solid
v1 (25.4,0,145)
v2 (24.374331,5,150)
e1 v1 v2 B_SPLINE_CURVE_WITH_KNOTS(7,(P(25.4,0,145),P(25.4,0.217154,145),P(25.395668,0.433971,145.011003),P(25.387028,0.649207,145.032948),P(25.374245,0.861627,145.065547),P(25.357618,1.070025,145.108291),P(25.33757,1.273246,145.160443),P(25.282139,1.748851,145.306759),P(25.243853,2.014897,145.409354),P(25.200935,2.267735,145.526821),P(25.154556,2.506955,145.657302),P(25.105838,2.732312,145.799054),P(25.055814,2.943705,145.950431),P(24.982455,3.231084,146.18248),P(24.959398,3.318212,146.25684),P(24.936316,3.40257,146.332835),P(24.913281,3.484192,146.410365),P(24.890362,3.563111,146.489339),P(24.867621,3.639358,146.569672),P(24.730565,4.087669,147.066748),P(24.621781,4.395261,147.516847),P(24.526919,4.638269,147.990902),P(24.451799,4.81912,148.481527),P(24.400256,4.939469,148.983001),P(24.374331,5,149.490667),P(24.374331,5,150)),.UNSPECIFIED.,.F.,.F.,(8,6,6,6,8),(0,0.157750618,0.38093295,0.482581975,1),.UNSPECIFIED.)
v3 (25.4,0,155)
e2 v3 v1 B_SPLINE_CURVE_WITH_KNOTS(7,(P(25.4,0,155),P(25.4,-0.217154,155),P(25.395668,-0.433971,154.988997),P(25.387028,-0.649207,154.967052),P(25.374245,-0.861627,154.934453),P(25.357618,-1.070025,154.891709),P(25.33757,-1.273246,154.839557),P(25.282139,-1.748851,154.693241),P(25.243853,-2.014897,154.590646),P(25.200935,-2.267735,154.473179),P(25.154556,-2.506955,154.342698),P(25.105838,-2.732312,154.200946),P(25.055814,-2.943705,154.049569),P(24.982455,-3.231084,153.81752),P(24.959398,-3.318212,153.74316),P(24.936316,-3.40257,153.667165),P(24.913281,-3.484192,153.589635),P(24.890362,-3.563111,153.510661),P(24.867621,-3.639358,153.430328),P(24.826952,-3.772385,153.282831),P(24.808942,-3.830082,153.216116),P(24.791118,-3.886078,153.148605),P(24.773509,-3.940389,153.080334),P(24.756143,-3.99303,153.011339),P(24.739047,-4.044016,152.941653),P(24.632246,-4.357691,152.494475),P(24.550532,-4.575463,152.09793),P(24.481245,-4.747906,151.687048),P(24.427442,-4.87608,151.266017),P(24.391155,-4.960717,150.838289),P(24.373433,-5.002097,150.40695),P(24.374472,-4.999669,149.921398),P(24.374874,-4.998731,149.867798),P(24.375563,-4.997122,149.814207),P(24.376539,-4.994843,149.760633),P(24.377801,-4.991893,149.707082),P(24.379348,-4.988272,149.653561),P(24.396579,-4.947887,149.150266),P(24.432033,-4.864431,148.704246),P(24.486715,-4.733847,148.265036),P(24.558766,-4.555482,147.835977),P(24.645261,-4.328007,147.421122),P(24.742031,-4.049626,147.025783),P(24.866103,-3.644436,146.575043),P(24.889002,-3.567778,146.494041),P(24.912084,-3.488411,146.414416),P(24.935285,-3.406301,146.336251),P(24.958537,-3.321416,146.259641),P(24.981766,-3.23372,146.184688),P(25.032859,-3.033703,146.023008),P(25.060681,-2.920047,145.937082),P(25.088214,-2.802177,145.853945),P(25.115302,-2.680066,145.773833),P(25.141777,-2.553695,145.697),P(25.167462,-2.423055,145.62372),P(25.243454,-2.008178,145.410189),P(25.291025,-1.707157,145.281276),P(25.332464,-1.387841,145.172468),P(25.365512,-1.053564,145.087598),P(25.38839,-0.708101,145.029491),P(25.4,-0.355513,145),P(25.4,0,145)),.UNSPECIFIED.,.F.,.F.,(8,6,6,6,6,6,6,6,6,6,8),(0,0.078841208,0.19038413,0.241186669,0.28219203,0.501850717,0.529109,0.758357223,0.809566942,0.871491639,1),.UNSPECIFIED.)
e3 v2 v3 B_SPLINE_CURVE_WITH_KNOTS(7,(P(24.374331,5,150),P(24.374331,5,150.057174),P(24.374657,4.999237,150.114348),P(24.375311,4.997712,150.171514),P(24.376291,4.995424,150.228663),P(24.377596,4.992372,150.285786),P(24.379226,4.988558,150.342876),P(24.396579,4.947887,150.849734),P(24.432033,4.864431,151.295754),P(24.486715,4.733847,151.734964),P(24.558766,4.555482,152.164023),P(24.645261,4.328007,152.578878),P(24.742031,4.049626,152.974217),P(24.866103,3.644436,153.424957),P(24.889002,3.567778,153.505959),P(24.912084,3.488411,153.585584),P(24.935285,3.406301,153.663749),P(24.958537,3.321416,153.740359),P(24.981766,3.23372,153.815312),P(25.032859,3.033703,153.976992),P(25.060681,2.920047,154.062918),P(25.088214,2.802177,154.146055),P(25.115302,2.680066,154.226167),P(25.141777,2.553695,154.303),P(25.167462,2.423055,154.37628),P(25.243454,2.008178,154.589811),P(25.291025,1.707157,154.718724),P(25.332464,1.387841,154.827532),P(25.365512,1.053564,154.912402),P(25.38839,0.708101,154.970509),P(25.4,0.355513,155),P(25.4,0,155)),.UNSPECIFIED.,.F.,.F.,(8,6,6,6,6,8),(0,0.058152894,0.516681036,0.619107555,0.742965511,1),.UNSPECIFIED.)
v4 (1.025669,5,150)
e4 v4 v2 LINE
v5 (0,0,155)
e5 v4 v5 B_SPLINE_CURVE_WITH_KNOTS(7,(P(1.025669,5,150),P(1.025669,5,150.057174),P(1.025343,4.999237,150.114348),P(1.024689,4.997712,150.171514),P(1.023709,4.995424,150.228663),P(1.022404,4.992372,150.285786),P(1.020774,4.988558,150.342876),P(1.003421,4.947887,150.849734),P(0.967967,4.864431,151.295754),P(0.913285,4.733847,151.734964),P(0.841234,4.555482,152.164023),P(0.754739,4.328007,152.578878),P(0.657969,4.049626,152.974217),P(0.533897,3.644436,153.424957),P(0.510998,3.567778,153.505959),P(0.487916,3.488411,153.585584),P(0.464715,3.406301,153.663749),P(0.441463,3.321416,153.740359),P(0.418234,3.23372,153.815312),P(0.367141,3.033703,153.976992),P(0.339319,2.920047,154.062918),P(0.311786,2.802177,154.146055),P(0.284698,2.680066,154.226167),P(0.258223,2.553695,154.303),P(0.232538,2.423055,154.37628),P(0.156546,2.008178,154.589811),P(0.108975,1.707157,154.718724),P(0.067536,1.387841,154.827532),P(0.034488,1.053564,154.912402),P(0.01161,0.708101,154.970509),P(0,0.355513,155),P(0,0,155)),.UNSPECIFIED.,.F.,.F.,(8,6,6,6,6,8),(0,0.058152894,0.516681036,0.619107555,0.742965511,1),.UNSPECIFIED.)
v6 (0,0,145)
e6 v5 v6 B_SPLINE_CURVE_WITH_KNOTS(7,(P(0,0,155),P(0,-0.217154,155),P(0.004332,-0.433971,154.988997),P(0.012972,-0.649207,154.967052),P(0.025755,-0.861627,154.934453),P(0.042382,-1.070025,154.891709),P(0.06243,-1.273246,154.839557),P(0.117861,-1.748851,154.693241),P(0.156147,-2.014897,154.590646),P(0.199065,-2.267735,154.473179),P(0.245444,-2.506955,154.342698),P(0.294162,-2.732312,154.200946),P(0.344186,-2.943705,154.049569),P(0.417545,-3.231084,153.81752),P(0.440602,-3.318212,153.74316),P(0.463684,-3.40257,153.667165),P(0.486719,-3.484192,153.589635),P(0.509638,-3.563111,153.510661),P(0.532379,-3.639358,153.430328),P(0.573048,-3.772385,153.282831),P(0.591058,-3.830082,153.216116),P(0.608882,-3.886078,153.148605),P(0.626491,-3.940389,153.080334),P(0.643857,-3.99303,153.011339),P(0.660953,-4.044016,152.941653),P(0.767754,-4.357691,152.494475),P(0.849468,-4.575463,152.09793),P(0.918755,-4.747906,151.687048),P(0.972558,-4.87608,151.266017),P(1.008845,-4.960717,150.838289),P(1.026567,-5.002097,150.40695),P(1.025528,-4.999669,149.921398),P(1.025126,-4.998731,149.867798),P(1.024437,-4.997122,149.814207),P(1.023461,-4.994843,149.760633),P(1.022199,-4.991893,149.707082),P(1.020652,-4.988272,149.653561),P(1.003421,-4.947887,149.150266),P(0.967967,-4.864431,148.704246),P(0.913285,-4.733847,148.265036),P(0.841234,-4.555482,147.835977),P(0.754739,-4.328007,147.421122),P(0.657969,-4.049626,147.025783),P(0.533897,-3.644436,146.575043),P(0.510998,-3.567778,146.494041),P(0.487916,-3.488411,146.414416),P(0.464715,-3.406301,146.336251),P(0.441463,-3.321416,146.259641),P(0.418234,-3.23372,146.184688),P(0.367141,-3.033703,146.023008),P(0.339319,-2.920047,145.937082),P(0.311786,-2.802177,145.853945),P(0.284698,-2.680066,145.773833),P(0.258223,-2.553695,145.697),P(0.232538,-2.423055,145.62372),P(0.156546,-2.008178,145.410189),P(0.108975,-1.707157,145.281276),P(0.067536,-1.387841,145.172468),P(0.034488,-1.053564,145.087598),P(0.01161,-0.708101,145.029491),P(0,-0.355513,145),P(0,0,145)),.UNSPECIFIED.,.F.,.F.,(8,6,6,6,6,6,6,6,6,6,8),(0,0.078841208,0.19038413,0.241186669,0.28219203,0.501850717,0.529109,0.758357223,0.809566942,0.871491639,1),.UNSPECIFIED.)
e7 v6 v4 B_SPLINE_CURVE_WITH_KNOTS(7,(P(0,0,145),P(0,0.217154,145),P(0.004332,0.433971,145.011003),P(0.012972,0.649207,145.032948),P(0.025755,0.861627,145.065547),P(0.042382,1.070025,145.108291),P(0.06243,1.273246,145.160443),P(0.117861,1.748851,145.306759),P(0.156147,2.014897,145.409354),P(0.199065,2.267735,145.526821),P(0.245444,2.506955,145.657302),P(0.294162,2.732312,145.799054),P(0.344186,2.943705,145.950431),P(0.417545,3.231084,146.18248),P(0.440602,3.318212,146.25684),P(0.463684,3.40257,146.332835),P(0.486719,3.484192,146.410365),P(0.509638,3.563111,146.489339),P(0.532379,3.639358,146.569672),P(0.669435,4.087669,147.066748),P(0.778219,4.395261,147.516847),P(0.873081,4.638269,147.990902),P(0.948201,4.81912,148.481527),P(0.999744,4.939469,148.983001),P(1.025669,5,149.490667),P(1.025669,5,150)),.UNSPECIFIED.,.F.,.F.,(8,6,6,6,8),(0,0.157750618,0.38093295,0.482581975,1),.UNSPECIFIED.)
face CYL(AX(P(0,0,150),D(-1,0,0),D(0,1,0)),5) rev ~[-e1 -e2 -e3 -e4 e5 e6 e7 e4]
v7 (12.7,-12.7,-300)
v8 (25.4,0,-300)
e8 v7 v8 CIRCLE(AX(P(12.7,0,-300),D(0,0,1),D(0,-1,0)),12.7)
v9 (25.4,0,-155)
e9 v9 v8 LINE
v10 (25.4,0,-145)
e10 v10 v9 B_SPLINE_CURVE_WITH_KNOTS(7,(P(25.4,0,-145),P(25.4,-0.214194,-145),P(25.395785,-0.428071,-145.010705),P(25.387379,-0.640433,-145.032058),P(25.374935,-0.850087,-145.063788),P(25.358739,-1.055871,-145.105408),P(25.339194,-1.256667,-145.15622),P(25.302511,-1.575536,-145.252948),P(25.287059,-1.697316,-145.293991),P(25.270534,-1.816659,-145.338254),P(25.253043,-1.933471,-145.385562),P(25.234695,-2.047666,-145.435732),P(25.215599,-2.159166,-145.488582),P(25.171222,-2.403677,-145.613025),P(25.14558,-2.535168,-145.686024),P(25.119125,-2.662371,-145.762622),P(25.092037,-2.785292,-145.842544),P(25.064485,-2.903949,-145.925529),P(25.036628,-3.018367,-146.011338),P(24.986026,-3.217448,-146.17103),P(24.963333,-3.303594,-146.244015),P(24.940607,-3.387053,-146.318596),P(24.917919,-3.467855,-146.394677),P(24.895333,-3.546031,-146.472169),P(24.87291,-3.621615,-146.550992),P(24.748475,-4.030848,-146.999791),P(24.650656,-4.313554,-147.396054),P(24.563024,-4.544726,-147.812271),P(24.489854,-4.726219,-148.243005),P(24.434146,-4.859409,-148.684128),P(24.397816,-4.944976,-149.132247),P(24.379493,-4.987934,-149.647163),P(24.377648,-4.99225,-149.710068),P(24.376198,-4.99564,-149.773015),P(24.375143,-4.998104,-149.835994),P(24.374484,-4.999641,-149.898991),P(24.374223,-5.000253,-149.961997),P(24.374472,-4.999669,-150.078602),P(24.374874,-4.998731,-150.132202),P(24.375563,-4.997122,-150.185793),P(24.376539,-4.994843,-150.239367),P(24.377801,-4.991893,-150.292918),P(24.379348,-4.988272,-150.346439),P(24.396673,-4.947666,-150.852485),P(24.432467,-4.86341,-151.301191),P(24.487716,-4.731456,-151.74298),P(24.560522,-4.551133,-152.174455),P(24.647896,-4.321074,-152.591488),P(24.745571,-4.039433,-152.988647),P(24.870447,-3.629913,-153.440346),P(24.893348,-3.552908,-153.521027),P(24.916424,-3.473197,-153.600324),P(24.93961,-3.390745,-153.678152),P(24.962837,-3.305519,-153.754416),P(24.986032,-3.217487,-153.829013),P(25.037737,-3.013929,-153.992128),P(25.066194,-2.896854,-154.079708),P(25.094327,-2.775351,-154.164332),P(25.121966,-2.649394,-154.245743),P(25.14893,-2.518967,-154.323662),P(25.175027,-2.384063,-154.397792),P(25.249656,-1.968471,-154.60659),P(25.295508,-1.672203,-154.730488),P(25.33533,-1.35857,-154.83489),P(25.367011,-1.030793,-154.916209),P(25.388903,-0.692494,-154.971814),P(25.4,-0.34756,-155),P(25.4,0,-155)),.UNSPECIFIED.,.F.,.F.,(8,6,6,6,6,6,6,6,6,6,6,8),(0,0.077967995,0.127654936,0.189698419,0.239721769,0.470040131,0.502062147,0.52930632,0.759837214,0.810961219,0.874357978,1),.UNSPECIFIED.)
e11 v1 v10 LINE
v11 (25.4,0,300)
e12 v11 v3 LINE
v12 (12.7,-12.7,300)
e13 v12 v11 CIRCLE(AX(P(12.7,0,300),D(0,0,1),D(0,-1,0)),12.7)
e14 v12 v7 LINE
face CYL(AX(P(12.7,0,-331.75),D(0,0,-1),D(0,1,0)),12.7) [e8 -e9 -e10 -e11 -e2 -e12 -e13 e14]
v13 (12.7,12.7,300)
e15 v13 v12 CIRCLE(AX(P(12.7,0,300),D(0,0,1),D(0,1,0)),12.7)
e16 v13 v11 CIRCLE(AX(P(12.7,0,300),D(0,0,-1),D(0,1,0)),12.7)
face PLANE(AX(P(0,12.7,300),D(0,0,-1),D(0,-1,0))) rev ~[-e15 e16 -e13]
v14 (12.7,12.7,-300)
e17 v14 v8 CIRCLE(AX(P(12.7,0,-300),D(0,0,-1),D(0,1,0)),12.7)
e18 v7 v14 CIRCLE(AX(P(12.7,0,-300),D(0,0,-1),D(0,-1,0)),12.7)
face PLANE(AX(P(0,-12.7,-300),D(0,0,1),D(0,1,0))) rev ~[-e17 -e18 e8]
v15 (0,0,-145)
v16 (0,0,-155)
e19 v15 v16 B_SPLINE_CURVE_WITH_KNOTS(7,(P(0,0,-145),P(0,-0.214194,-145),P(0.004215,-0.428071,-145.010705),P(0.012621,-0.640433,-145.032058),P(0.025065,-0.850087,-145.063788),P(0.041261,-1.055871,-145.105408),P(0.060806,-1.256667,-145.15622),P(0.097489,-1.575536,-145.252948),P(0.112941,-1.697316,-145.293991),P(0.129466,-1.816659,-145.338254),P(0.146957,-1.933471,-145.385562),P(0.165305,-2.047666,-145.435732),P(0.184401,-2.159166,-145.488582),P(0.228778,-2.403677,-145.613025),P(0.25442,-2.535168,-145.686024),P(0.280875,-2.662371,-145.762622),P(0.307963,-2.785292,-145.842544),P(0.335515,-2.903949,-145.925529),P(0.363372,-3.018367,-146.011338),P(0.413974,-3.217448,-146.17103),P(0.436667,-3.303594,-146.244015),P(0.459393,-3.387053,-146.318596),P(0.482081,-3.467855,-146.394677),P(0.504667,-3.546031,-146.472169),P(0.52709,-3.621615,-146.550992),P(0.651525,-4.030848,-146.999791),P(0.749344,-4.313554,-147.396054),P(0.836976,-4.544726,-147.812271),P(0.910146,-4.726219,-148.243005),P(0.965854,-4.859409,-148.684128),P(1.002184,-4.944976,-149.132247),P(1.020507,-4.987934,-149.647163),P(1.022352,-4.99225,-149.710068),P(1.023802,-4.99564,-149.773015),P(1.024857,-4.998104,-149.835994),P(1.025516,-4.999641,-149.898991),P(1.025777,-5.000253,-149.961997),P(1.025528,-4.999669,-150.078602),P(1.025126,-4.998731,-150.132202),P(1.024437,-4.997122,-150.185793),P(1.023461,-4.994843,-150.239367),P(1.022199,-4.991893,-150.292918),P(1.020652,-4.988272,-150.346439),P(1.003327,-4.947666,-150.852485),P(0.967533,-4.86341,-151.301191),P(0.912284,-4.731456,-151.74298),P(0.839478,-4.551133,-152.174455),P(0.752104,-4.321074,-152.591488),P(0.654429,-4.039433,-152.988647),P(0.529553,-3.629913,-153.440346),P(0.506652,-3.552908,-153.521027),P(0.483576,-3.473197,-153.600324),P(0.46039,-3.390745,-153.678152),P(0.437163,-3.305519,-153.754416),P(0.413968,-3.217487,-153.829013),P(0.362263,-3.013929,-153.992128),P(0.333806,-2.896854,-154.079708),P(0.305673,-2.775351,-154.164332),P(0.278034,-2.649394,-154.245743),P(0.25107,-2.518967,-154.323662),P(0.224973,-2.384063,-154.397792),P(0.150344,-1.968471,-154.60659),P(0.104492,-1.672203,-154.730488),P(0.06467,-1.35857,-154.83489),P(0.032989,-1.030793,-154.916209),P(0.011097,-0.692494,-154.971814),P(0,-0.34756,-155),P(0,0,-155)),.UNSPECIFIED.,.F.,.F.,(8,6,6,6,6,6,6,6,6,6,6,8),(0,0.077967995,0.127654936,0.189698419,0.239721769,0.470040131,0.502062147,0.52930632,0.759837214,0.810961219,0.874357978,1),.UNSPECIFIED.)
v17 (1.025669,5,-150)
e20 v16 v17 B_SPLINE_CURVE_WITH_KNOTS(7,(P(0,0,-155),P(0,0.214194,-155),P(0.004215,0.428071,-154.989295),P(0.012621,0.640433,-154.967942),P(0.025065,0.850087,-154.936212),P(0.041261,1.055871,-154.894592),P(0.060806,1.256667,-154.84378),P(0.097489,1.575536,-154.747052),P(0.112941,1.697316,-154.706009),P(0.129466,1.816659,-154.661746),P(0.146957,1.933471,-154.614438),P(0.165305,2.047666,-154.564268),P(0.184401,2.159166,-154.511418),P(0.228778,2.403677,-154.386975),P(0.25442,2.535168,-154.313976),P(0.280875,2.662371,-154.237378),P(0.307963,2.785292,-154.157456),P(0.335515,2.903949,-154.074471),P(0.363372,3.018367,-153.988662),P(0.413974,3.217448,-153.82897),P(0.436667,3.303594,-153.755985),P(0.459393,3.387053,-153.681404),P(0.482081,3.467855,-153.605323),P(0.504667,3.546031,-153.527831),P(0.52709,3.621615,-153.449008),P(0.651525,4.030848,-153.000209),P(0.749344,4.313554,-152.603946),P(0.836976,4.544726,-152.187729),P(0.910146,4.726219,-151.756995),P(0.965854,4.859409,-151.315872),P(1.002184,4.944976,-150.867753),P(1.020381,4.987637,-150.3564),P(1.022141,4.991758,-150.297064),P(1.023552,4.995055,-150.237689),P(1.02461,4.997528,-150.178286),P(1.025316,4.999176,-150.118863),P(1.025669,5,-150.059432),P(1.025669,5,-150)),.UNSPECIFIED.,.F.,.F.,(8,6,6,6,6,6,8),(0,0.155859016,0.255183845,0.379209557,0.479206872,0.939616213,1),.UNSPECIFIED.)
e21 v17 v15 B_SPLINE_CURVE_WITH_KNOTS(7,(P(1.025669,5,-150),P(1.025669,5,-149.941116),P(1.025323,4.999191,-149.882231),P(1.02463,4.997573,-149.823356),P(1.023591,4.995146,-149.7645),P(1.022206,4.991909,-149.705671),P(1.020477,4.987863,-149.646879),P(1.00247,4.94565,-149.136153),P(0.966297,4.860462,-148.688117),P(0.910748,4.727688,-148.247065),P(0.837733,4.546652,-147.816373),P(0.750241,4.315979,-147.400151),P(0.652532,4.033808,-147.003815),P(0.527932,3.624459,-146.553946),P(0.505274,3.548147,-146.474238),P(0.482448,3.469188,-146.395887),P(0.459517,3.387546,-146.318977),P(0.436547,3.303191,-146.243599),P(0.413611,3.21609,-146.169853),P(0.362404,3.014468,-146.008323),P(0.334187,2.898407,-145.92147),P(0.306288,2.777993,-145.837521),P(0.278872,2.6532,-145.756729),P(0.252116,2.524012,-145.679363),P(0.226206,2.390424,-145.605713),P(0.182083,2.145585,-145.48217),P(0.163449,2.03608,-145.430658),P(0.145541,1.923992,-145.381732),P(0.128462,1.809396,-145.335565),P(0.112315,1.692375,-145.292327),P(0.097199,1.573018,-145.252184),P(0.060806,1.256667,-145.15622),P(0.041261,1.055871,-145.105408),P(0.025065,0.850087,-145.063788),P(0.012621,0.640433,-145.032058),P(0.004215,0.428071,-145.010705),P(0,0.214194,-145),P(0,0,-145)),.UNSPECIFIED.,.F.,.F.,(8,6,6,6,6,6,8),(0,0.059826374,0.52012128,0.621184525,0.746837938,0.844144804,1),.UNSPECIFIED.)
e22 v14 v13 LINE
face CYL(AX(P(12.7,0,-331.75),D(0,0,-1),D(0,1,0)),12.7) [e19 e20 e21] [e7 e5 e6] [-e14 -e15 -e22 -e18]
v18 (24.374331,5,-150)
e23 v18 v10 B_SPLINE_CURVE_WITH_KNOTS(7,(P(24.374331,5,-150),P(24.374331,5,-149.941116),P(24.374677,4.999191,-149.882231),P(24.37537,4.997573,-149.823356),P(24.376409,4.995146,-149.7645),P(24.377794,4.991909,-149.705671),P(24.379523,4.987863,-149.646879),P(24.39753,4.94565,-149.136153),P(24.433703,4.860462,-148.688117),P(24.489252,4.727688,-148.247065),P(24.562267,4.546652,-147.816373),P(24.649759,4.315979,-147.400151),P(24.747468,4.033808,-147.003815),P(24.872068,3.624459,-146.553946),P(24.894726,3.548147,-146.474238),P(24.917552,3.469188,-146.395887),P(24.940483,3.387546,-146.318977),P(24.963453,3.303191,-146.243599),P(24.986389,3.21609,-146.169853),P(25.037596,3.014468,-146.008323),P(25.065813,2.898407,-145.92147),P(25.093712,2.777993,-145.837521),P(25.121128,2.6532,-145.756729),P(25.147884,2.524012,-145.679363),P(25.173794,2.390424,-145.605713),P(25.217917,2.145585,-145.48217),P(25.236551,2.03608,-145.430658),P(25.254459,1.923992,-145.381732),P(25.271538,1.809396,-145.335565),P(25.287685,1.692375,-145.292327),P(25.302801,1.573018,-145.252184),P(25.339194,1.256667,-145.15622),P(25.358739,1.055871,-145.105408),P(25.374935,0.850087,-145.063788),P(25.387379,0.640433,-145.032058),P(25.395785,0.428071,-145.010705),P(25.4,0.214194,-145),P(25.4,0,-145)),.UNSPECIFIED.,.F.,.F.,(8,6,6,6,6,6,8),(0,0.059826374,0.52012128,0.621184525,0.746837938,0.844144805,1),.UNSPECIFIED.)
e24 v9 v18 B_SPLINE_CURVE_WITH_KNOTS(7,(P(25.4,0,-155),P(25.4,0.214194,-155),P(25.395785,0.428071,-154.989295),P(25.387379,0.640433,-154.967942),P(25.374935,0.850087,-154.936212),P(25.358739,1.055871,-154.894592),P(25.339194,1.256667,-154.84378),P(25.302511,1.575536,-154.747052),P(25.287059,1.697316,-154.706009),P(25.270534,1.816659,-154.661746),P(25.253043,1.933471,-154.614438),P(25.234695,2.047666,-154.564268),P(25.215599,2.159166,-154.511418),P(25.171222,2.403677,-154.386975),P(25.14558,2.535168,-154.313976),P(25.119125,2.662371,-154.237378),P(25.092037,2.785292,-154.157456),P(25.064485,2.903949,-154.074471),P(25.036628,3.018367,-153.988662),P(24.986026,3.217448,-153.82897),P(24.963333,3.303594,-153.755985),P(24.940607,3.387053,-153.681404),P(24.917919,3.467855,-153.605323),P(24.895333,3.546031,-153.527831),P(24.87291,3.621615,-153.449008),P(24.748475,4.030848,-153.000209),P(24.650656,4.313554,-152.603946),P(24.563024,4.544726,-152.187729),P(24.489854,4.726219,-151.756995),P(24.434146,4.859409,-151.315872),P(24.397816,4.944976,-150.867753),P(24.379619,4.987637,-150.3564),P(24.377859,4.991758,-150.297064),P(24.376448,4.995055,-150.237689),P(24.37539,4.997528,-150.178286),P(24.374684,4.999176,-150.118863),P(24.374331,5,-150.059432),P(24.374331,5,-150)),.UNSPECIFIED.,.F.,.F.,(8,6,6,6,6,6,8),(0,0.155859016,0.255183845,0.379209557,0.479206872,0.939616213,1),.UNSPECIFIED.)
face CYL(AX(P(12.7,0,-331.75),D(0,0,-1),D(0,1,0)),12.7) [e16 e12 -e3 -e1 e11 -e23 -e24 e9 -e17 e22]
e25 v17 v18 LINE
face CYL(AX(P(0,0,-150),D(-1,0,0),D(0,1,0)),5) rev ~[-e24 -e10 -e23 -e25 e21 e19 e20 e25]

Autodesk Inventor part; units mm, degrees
ref_plane "YZ Plane" through (0, 0, 0) normal (1, 0, 0) x (0, 1, 0)
ref_plane "XZ Plane" through (0, 0, 0) normal (0, 1, 0) x (-1, 0, 0)
ref_plane "XY Plane" through (0, 0, 0) normal (0, 0, 1) x (1, 0, 0)
sketch "Sketch1" plane through (0, 0, 0) normal (1, 0, 0) x (0, 1, 0)
  line L0 (12.7, 300) -> (-12.7, 300)
  line L1 (-12.7, 300) -> (-12.7, -300)
  line L2 (-12.7, -300) -> (12.7, -300)
  line L3 (12.7, -300) -> (12.7, 300)
  line L4 (12.7, 300) -> (-12.7, -300) construction
  line L5 (-12.7, 300) -> (12.7, -300) construction
  circle A0 centre (0, 150) radius 5
  circle A1 centre (0, -150) radius 5
  line L6 (0, 0) -> (0, -150)
  dimension "d0" = 25.4
  dimension "d1" = 600
  dimension "d3" = 10
  dimension "d8" = 150
extrude "Extrusion1" add sketch "Sketch1" along normal blind 25.4
fillet "Fillet1" radius 12.7 4 edges at (25.4, -12.7, 0) (0, -12.7, 0) (25.4, 12.7, 0) (0, 12.7, 0)
properties part number "Eixo_traseiro"
